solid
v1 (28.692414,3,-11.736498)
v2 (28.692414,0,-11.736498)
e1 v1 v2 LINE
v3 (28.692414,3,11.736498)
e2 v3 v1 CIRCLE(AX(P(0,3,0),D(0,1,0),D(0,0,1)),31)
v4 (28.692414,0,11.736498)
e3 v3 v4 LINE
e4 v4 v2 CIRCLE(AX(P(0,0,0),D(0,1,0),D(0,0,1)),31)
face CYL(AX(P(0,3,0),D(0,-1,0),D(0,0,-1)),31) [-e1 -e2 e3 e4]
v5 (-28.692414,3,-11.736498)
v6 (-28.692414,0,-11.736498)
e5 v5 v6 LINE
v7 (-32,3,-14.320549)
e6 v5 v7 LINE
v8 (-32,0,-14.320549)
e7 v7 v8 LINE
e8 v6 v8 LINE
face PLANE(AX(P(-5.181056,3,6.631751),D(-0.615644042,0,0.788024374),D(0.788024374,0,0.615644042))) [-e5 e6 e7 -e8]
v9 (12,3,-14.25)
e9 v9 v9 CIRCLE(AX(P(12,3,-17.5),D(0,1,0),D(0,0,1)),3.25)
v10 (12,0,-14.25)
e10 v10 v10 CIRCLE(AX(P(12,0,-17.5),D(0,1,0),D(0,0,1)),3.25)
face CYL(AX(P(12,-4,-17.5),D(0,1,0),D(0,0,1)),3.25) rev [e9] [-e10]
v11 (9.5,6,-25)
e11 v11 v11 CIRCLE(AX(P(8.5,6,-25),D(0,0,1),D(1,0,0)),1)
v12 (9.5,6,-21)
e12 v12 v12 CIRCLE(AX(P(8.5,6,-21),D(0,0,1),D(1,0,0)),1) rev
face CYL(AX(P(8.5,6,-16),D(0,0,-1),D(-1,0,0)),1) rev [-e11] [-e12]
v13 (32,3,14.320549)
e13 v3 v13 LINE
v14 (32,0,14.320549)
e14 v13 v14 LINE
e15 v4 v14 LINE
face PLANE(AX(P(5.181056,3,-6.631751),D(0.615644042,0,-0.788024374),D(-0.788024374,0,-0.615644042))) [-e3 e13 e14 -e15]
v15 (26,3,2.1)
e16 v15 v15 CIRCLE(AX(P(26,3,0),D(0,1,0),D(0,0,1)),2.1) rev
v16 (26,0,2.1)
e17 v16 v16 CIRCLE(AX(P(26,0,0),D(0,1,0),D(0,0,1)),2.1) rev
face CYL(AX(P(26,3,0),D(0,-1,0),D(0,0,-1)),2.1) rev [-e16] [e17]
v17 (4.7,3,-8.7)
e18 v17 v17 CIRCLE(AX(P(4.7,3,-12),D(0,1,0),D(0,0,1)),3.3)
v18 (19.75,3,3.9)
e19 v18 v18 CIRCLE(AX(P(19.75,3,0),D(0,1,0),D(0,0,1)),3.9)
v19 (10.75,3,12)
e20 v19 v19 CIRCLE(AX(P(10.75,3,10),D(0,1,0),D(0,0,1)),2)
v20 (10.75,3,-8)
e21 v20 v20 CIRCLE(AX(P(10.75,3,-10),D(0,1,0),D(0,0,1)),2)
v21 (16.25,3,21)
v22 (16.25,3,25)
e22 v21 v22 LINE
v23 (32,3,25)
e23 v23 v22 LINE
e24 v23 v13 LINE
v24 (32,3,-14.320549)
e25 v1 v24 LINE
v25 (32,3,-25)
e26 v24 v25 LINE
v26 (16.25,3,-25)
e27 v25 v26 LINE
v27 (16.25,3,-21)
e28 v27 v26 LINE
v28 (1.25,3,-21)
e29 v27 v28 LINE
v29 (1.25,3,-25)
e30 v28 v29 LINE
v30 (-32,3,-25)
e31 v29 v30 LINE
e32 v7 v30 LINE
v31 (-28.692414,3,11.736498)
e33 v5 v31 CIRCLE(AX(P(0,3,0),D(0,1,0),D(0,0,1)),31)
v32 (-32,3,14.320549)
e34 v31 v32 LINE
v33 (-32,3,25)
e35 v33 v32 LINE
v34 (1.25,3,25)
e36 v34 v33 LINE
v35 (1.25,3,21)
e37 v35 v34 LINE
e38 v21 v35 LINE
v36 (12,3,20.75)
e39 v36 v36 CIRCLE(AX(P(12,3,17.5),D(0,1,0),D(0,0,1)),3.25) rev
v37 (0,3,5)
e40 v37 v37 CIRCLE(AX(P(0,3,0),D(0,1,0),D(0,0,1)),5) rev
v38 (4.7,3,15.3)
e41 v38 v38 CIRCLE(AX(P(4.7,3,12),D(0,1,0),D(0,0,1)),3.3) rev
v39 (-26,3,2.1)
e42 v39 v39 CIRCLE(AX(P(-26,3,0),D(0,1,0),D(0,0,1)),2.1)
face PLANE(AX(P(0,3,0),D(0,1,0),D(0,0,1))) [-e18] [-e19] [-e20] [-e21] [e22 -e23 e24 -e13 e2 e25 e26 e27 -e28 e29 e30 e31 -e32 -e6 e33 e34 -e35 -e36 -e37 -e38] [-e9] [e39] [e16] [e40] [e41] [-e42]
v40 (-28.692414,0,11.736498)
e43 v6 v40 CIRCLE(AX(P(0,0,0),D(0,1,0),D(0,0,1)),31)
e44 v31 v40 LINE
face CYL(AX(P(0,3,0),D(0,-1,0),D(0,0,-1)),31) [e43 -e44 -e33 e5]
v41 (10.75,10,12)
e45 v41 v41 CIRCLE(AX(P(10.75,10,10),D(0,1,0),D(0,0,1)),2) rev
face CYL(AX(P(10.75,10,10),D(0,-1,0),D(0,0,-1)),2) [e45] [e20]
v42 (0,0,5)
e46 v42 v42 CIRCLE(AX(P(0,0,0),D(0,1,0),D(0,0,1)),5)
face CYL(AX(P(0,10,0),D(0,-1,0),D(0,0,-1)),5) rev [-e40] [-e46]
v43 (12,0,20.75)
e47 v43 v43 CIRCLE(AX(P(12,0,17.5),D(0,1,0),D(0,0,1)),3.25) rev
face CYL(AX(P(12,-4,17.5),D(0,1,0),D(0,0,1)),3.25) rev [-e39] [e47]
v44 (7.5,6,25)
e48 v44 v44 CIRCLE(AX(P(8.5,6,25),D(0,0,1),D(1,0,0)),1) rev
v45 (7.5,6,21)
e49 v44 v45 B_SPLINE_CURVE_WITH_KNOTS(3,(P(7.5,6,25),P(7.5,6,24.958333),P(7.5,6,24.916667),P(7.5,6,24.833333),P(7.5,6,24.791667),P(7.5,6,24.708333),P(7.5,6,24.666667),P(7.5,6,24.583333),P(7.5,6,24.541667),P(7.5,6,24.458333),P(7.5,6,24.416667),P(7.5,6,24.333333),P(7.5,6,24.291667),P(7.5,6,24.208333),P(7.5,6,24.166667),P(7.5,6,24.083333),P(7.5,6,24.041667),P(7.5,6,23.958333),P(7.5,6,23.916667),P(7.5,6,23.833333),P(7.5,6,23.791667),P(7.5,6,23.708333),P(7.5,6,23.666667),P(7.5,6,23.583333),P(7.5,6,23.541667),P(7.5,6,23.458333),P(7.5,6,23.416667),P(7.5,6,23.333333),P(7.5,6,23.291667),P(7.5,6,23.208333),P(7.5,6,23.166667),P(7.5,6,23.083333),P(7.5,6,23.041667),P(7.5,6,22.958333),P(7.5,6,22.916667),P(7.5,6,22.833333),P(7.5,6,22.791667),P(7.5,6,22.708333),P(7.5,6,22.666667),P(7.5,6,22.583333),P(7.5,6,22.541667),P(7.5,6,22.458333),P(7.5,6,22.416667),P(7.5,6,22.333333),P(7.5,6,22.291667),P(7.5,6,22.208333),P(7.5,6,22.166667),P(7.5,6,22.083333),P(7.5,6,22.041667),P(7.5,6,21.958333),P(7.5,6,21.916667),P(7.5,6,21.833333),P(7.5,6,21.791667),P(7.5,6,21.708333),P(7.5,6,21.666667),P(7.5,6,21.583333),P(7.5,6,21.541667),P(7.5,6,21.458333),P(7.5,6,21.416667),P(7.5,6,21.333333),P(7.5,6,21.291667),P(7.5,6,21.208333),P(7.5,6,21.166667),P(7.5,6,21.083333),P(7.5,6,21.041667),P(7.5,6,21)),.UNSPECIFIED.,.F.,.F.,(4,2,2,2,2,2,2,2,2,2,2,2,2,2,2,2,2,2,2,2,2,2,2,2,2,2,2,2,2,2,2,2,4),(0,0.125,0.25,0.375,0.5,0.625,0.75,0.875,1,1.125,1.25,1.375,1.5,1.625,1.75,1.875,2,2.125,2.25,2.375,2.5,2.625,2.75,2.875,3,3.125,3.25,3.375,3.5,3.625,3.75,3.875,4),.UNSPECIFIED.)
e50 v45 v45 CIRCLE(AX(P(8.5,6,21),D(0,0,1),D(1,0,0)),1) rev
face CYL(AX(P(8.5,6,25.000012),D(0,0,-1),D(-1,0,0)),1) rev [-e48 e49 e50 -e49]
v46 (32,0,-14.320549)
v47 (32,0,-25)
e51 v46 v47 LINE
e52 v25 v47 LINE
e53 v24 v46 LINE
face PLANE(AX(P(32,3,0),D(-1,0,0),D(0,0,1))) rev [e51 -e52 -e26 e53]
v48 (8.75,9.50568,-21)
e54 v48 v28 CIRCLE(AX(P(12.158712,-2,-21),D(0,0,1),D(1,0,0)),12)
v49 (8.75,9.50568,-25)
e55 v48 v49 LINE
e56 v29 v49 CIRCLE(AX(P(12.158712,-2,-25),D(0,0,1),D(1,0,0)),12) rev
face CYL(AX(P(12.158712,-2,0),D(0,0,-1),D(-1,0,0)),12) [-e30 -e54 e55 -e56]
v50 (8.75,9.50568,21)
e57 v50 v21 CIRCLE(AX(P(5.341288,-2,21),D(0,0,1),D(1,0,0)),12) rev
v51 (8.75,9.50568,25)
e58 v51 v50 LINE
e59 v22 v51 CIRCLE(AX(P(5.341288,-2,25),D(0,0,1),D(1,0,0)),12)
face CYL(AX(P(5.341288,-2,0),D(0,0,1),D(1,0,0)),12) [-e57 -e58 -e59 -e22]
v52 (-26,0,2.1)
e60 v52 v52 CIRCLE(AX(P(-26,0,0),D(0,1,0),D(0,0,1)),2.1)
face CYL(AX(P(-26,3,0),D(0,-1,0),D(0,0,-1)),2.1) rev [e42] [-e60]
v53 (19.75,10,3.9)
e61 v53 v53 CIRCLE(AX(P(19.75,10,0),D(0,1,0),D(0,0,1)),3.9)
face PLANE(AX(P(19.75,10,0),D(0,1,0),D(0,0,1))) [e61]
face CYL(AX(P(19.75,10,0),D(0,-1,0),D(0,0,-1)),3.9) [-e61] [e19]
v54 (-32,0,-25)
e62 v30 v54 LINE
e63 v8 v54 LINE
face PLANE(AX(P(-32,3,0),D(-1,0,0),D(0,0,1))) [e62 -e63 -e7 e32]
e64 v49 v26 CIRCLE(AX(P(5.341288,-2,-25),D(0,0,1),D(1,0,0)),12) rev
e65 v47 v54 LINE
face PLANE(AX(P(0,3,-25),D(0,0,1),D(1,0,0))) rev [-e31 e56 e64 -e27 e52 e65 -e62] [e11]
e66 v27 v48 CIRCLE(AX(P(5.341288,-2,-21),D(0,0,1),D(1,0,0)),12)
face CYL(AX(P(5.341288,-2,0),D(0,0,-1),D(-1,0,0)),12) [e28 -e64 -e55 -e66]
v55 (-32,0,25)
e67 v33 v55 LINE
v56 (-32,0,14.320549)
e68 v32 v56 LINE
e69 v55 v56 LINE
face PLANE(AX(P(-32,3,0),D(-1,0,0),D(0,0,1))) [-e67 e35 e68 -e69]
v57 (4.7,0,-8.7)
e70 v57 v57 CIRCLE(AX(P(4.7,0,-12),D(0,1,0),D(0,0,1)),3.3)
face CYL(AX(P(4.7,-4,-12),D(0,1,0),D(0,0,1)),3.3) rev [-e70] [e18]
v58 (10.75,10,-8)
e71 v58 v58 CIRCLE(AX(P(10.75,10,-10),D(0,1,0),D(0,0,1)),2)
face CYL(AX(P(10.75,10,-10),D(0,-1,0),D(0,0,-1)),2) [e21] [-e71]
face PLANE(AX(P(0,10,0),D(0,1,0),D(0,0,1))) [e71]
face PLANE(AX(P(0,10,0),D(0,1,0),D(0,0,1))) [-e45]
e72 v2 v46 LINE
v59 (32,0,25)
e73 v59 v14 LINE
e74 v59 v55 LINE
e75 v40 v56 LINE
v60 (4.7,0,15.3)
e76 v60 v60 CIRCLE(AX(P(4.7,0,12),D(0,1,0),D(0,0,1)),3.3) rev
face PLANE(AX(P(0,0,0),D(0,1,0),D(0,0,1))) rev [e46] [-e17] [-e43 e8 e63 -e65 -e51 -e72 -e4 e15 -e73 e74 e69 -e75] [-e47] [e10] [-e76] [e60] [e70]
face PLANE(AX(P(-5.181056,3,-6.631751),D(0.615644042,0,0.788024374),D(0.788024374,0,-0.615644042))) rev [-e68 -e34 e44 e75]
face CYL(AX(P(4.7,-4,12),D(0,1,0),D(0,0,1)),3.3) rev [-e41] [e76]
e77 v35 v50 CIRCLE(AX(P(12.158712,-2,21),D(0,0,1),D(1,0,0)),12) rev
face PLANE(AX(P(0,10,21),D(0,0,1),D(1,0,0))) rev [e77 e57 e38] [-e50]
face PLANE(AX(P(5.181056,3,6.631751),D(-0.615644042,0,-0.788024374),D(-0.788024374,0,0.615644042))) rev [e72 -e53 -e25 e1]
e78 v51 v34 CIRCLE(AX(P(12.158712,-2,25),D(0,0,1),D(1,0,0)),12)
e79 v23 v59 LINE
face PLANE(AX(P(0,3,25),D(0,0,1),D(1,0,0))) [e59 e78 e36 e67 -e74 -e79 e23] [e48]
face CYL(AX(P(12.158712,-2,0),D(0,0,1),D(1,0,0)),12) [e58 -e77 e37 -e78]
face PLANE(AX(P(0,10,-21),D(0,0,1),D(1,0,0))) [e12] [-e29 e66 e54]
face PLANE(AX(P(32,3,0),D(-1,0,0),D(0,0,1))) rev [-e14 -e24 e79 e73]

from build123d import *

# Parameters (mm, degrees)
SKETCH1_R               = 2.1
BOSS_EXTRUDE2_DEPTH     = 3
SKETCH1_14_R            = 5
CUT_EXTRUDE2_DEPTH      = 10
SKETCH2_R               = 2
SKETCH2_W               = 15
SKETCH2_H               = 4
SKETCH2_R_2             = 3.9
BOSS_EXTRUDE3_DEPTH     = 7
SKETCH2_4_R             = 3.25
SKETCH2_4_R_2           = 3.3
CUT_EXTRUDE3_DEPTH      = 7
CUT_EXTRUDE4_DEPTH      = 61.199667773
CUT_EXTRUDE4_DEPTH_BACK = 7
SKETCH3_R               = 1
FILLET1_R               = 12
CUT_EXTRUDE5_START      = -41
SKETCH3_3_R             = 1
CUT_EXTRUDE5_DEPTH      = 9


with BuildPart() as part:
    # Sketch1 → Boss-Extrude2 (new body)
    with BuildSketch(Plane(origin=(0, 0, 0), x_dir=(1, 0, 0), z_dir=(0, 1, 0))):
        with BuildLine():
            Line((32, -25), (32, -14.320549047))
            Line((32, -14.320549047), (28.692414075, -11.736497543))
            ThreePointArc((28.692414075, -11.736497543), (31, 0), (28.692414075, 11.736497543))
            Line((28.692414075, 11.736497543), (32, 14.320549047))
            Line((32, 14.320549047), (32, 25))
            Line((32, 25), (-32, 25))
            Line((-32, 25), (-32, 14.320549047))
            Line((-32, 14.320549047), (-28.692414075, 11.736497543))
            ThreePointArc((-28.692414075, 11.736497543), (-31, 0), (-28.692414075, -11.736497543))
            Line((-28.692414075, -11.736497543), (-32, -14.320549047))
            Line((-32, -14.320549047), (-32, -25))
            Line((-32, -25), (32, -25))
        make_face()
        with Locations(Location((26, 0, 0), (0, 0, 270))):
            Circle(SKETCH1_R, mode=Mode.SUBTRACT)
        with Locations(Location((-26, 0, 0), (0, 0, 270))):
            Circle(SKETCH1_R, mode=Mode.SUBTRACT)
    extrude(amount=BOSS_EXTRUDE2_DEPTH)

    # Sketch1<14> → Cut-Extrude2 (cut)
    with BuildSketch(Plane(origin=(0, 0, 0), x_dir=(1, 0, 0), z_dir=(0, 1, 0))):
        with Locations(Location((0, 0, 0), (0, 0, 270))):
            Circle(SKETCH1_14_R)
    extrude(amount=CUT_EXTRUDE2_DEPTH, mode=Mode.SUBTRACT)

    # Sketch2 → Boss-Extrude3 (add)
    with BuildSketch(Plane(origin=(0, 3, 0), x_dir=(1, 0, 0), z_dir=(0, 1, 0))):
        with Locations(Location((10.75, -10, 0), (0, 0, 269.999999999))):
            Circle(SKETCH2_R)
        Polygon((8.75, -21), (1.25, -21), (1.25, -25), (16.25, -25), (16.25, -21), align=None)
        with Locations((8.75, 23)):
            Rectangle(SKETCH2_W, SKETCH2_H)
        with Locations(Location((19.75, 0, 0), (0, 0, 270))):
            Circle(SKETCH2_R_2)
        with Locations(Location((10.75, 10, 0), (0, 0, 270))):
            Circle(SKETCH2_R)
    extrude(amount=BOSS_EXTRUDE3_DEPTH)

    # Sketch2<4> → Cut-Extrude3 (cut)
    with BuildSketch(Plane(origin=(0, 3, 0), x_dir=(1, 0, 0), z_dir=(0, 1, 0))):
        with Locations(Location((12, 17.5, 0), (0, 0, 270))):
            Circle(SKETCH2_4_R)
        with Locations(Location((4.7, 12, 0), (0, 0, 270))):
            Circle(SKETCH2_4_R_2)
        with Locations(Location((12, -17.5, 0), (0, 0, 270))):
            Circle(SKETCH2_4_R)
        with Locations(Location((4.7, -12, 0), (0, 0, 270))):
            Circle(SKETCH2_4_R_2)
    extrude(amount=-CUT_EXTRUDE3_DEPTH, mode=Mode.SUBTRACT)

    # Sketch3 → Cut-Extrude4 (cut, two sides: drawn at the far end of the back side and taken through both)
    with BuildSketch(Plane.XY.offset(25).offset(-CUT_EXTRUDE4_DEPTH_BACK)):
        with Locations(Location((8.5, 6, 0), (0, 0, 180))):
            Circle(SKETCH3_R)
    extrude(amount=CUT_EXTRUDE4_DEPTH + CUT_EXTRUDE4_DEPTH_BACK, mode=Mode.SUBTRACT)

    # Fillet1
    # the kernel refuses this fillet: 12 mm, written as the material it takes off along each edge
    with BuildSketch(Plane(origin=(1.25, 10, -52.271780287), x_dir=(0, -1, 0), z_dir=(0, 0, 1)), Plane(origin=(16.25, 10, -21), x_dir=(0, -1, 0), z_dir=(0, 0, -1)), Plane(origin=(1.25, 10, 21), x_dir=(0, -1, 0), z_dir=(0, 0, 1)), Plane(origin=(16.25, 10, 52.271780287), x_dir=(0, -1, 0), z_dir=(0, 0, -1))) as fillet1_piece_1:
        with BuildLine():
            CenterArc((12, 10.908712115), FILLET1_R, 180, 65.375681648)
            Line((0, 10.908712115), (0, 0))
            Line((0, 0), (7, 0))
        make_face()
    extrude(amount=31.271780287, mode=Mode.SUBTRACT)

    # Sketch3<3> → Cut-Extrude5 (cut)
    with BuildSketch(Plane.XY.offset(25).offset(CUT_EXTRUDE5_START)):
        with Locations(Location((8.5, 6, 0), (0, 0, 180))):
            Circle(SKETCH3_3_R)
    extrude(amount=-CUT_EXTRUDE5_DEPTH, mode=Mode.SUBTRACT)


solid = part.part
